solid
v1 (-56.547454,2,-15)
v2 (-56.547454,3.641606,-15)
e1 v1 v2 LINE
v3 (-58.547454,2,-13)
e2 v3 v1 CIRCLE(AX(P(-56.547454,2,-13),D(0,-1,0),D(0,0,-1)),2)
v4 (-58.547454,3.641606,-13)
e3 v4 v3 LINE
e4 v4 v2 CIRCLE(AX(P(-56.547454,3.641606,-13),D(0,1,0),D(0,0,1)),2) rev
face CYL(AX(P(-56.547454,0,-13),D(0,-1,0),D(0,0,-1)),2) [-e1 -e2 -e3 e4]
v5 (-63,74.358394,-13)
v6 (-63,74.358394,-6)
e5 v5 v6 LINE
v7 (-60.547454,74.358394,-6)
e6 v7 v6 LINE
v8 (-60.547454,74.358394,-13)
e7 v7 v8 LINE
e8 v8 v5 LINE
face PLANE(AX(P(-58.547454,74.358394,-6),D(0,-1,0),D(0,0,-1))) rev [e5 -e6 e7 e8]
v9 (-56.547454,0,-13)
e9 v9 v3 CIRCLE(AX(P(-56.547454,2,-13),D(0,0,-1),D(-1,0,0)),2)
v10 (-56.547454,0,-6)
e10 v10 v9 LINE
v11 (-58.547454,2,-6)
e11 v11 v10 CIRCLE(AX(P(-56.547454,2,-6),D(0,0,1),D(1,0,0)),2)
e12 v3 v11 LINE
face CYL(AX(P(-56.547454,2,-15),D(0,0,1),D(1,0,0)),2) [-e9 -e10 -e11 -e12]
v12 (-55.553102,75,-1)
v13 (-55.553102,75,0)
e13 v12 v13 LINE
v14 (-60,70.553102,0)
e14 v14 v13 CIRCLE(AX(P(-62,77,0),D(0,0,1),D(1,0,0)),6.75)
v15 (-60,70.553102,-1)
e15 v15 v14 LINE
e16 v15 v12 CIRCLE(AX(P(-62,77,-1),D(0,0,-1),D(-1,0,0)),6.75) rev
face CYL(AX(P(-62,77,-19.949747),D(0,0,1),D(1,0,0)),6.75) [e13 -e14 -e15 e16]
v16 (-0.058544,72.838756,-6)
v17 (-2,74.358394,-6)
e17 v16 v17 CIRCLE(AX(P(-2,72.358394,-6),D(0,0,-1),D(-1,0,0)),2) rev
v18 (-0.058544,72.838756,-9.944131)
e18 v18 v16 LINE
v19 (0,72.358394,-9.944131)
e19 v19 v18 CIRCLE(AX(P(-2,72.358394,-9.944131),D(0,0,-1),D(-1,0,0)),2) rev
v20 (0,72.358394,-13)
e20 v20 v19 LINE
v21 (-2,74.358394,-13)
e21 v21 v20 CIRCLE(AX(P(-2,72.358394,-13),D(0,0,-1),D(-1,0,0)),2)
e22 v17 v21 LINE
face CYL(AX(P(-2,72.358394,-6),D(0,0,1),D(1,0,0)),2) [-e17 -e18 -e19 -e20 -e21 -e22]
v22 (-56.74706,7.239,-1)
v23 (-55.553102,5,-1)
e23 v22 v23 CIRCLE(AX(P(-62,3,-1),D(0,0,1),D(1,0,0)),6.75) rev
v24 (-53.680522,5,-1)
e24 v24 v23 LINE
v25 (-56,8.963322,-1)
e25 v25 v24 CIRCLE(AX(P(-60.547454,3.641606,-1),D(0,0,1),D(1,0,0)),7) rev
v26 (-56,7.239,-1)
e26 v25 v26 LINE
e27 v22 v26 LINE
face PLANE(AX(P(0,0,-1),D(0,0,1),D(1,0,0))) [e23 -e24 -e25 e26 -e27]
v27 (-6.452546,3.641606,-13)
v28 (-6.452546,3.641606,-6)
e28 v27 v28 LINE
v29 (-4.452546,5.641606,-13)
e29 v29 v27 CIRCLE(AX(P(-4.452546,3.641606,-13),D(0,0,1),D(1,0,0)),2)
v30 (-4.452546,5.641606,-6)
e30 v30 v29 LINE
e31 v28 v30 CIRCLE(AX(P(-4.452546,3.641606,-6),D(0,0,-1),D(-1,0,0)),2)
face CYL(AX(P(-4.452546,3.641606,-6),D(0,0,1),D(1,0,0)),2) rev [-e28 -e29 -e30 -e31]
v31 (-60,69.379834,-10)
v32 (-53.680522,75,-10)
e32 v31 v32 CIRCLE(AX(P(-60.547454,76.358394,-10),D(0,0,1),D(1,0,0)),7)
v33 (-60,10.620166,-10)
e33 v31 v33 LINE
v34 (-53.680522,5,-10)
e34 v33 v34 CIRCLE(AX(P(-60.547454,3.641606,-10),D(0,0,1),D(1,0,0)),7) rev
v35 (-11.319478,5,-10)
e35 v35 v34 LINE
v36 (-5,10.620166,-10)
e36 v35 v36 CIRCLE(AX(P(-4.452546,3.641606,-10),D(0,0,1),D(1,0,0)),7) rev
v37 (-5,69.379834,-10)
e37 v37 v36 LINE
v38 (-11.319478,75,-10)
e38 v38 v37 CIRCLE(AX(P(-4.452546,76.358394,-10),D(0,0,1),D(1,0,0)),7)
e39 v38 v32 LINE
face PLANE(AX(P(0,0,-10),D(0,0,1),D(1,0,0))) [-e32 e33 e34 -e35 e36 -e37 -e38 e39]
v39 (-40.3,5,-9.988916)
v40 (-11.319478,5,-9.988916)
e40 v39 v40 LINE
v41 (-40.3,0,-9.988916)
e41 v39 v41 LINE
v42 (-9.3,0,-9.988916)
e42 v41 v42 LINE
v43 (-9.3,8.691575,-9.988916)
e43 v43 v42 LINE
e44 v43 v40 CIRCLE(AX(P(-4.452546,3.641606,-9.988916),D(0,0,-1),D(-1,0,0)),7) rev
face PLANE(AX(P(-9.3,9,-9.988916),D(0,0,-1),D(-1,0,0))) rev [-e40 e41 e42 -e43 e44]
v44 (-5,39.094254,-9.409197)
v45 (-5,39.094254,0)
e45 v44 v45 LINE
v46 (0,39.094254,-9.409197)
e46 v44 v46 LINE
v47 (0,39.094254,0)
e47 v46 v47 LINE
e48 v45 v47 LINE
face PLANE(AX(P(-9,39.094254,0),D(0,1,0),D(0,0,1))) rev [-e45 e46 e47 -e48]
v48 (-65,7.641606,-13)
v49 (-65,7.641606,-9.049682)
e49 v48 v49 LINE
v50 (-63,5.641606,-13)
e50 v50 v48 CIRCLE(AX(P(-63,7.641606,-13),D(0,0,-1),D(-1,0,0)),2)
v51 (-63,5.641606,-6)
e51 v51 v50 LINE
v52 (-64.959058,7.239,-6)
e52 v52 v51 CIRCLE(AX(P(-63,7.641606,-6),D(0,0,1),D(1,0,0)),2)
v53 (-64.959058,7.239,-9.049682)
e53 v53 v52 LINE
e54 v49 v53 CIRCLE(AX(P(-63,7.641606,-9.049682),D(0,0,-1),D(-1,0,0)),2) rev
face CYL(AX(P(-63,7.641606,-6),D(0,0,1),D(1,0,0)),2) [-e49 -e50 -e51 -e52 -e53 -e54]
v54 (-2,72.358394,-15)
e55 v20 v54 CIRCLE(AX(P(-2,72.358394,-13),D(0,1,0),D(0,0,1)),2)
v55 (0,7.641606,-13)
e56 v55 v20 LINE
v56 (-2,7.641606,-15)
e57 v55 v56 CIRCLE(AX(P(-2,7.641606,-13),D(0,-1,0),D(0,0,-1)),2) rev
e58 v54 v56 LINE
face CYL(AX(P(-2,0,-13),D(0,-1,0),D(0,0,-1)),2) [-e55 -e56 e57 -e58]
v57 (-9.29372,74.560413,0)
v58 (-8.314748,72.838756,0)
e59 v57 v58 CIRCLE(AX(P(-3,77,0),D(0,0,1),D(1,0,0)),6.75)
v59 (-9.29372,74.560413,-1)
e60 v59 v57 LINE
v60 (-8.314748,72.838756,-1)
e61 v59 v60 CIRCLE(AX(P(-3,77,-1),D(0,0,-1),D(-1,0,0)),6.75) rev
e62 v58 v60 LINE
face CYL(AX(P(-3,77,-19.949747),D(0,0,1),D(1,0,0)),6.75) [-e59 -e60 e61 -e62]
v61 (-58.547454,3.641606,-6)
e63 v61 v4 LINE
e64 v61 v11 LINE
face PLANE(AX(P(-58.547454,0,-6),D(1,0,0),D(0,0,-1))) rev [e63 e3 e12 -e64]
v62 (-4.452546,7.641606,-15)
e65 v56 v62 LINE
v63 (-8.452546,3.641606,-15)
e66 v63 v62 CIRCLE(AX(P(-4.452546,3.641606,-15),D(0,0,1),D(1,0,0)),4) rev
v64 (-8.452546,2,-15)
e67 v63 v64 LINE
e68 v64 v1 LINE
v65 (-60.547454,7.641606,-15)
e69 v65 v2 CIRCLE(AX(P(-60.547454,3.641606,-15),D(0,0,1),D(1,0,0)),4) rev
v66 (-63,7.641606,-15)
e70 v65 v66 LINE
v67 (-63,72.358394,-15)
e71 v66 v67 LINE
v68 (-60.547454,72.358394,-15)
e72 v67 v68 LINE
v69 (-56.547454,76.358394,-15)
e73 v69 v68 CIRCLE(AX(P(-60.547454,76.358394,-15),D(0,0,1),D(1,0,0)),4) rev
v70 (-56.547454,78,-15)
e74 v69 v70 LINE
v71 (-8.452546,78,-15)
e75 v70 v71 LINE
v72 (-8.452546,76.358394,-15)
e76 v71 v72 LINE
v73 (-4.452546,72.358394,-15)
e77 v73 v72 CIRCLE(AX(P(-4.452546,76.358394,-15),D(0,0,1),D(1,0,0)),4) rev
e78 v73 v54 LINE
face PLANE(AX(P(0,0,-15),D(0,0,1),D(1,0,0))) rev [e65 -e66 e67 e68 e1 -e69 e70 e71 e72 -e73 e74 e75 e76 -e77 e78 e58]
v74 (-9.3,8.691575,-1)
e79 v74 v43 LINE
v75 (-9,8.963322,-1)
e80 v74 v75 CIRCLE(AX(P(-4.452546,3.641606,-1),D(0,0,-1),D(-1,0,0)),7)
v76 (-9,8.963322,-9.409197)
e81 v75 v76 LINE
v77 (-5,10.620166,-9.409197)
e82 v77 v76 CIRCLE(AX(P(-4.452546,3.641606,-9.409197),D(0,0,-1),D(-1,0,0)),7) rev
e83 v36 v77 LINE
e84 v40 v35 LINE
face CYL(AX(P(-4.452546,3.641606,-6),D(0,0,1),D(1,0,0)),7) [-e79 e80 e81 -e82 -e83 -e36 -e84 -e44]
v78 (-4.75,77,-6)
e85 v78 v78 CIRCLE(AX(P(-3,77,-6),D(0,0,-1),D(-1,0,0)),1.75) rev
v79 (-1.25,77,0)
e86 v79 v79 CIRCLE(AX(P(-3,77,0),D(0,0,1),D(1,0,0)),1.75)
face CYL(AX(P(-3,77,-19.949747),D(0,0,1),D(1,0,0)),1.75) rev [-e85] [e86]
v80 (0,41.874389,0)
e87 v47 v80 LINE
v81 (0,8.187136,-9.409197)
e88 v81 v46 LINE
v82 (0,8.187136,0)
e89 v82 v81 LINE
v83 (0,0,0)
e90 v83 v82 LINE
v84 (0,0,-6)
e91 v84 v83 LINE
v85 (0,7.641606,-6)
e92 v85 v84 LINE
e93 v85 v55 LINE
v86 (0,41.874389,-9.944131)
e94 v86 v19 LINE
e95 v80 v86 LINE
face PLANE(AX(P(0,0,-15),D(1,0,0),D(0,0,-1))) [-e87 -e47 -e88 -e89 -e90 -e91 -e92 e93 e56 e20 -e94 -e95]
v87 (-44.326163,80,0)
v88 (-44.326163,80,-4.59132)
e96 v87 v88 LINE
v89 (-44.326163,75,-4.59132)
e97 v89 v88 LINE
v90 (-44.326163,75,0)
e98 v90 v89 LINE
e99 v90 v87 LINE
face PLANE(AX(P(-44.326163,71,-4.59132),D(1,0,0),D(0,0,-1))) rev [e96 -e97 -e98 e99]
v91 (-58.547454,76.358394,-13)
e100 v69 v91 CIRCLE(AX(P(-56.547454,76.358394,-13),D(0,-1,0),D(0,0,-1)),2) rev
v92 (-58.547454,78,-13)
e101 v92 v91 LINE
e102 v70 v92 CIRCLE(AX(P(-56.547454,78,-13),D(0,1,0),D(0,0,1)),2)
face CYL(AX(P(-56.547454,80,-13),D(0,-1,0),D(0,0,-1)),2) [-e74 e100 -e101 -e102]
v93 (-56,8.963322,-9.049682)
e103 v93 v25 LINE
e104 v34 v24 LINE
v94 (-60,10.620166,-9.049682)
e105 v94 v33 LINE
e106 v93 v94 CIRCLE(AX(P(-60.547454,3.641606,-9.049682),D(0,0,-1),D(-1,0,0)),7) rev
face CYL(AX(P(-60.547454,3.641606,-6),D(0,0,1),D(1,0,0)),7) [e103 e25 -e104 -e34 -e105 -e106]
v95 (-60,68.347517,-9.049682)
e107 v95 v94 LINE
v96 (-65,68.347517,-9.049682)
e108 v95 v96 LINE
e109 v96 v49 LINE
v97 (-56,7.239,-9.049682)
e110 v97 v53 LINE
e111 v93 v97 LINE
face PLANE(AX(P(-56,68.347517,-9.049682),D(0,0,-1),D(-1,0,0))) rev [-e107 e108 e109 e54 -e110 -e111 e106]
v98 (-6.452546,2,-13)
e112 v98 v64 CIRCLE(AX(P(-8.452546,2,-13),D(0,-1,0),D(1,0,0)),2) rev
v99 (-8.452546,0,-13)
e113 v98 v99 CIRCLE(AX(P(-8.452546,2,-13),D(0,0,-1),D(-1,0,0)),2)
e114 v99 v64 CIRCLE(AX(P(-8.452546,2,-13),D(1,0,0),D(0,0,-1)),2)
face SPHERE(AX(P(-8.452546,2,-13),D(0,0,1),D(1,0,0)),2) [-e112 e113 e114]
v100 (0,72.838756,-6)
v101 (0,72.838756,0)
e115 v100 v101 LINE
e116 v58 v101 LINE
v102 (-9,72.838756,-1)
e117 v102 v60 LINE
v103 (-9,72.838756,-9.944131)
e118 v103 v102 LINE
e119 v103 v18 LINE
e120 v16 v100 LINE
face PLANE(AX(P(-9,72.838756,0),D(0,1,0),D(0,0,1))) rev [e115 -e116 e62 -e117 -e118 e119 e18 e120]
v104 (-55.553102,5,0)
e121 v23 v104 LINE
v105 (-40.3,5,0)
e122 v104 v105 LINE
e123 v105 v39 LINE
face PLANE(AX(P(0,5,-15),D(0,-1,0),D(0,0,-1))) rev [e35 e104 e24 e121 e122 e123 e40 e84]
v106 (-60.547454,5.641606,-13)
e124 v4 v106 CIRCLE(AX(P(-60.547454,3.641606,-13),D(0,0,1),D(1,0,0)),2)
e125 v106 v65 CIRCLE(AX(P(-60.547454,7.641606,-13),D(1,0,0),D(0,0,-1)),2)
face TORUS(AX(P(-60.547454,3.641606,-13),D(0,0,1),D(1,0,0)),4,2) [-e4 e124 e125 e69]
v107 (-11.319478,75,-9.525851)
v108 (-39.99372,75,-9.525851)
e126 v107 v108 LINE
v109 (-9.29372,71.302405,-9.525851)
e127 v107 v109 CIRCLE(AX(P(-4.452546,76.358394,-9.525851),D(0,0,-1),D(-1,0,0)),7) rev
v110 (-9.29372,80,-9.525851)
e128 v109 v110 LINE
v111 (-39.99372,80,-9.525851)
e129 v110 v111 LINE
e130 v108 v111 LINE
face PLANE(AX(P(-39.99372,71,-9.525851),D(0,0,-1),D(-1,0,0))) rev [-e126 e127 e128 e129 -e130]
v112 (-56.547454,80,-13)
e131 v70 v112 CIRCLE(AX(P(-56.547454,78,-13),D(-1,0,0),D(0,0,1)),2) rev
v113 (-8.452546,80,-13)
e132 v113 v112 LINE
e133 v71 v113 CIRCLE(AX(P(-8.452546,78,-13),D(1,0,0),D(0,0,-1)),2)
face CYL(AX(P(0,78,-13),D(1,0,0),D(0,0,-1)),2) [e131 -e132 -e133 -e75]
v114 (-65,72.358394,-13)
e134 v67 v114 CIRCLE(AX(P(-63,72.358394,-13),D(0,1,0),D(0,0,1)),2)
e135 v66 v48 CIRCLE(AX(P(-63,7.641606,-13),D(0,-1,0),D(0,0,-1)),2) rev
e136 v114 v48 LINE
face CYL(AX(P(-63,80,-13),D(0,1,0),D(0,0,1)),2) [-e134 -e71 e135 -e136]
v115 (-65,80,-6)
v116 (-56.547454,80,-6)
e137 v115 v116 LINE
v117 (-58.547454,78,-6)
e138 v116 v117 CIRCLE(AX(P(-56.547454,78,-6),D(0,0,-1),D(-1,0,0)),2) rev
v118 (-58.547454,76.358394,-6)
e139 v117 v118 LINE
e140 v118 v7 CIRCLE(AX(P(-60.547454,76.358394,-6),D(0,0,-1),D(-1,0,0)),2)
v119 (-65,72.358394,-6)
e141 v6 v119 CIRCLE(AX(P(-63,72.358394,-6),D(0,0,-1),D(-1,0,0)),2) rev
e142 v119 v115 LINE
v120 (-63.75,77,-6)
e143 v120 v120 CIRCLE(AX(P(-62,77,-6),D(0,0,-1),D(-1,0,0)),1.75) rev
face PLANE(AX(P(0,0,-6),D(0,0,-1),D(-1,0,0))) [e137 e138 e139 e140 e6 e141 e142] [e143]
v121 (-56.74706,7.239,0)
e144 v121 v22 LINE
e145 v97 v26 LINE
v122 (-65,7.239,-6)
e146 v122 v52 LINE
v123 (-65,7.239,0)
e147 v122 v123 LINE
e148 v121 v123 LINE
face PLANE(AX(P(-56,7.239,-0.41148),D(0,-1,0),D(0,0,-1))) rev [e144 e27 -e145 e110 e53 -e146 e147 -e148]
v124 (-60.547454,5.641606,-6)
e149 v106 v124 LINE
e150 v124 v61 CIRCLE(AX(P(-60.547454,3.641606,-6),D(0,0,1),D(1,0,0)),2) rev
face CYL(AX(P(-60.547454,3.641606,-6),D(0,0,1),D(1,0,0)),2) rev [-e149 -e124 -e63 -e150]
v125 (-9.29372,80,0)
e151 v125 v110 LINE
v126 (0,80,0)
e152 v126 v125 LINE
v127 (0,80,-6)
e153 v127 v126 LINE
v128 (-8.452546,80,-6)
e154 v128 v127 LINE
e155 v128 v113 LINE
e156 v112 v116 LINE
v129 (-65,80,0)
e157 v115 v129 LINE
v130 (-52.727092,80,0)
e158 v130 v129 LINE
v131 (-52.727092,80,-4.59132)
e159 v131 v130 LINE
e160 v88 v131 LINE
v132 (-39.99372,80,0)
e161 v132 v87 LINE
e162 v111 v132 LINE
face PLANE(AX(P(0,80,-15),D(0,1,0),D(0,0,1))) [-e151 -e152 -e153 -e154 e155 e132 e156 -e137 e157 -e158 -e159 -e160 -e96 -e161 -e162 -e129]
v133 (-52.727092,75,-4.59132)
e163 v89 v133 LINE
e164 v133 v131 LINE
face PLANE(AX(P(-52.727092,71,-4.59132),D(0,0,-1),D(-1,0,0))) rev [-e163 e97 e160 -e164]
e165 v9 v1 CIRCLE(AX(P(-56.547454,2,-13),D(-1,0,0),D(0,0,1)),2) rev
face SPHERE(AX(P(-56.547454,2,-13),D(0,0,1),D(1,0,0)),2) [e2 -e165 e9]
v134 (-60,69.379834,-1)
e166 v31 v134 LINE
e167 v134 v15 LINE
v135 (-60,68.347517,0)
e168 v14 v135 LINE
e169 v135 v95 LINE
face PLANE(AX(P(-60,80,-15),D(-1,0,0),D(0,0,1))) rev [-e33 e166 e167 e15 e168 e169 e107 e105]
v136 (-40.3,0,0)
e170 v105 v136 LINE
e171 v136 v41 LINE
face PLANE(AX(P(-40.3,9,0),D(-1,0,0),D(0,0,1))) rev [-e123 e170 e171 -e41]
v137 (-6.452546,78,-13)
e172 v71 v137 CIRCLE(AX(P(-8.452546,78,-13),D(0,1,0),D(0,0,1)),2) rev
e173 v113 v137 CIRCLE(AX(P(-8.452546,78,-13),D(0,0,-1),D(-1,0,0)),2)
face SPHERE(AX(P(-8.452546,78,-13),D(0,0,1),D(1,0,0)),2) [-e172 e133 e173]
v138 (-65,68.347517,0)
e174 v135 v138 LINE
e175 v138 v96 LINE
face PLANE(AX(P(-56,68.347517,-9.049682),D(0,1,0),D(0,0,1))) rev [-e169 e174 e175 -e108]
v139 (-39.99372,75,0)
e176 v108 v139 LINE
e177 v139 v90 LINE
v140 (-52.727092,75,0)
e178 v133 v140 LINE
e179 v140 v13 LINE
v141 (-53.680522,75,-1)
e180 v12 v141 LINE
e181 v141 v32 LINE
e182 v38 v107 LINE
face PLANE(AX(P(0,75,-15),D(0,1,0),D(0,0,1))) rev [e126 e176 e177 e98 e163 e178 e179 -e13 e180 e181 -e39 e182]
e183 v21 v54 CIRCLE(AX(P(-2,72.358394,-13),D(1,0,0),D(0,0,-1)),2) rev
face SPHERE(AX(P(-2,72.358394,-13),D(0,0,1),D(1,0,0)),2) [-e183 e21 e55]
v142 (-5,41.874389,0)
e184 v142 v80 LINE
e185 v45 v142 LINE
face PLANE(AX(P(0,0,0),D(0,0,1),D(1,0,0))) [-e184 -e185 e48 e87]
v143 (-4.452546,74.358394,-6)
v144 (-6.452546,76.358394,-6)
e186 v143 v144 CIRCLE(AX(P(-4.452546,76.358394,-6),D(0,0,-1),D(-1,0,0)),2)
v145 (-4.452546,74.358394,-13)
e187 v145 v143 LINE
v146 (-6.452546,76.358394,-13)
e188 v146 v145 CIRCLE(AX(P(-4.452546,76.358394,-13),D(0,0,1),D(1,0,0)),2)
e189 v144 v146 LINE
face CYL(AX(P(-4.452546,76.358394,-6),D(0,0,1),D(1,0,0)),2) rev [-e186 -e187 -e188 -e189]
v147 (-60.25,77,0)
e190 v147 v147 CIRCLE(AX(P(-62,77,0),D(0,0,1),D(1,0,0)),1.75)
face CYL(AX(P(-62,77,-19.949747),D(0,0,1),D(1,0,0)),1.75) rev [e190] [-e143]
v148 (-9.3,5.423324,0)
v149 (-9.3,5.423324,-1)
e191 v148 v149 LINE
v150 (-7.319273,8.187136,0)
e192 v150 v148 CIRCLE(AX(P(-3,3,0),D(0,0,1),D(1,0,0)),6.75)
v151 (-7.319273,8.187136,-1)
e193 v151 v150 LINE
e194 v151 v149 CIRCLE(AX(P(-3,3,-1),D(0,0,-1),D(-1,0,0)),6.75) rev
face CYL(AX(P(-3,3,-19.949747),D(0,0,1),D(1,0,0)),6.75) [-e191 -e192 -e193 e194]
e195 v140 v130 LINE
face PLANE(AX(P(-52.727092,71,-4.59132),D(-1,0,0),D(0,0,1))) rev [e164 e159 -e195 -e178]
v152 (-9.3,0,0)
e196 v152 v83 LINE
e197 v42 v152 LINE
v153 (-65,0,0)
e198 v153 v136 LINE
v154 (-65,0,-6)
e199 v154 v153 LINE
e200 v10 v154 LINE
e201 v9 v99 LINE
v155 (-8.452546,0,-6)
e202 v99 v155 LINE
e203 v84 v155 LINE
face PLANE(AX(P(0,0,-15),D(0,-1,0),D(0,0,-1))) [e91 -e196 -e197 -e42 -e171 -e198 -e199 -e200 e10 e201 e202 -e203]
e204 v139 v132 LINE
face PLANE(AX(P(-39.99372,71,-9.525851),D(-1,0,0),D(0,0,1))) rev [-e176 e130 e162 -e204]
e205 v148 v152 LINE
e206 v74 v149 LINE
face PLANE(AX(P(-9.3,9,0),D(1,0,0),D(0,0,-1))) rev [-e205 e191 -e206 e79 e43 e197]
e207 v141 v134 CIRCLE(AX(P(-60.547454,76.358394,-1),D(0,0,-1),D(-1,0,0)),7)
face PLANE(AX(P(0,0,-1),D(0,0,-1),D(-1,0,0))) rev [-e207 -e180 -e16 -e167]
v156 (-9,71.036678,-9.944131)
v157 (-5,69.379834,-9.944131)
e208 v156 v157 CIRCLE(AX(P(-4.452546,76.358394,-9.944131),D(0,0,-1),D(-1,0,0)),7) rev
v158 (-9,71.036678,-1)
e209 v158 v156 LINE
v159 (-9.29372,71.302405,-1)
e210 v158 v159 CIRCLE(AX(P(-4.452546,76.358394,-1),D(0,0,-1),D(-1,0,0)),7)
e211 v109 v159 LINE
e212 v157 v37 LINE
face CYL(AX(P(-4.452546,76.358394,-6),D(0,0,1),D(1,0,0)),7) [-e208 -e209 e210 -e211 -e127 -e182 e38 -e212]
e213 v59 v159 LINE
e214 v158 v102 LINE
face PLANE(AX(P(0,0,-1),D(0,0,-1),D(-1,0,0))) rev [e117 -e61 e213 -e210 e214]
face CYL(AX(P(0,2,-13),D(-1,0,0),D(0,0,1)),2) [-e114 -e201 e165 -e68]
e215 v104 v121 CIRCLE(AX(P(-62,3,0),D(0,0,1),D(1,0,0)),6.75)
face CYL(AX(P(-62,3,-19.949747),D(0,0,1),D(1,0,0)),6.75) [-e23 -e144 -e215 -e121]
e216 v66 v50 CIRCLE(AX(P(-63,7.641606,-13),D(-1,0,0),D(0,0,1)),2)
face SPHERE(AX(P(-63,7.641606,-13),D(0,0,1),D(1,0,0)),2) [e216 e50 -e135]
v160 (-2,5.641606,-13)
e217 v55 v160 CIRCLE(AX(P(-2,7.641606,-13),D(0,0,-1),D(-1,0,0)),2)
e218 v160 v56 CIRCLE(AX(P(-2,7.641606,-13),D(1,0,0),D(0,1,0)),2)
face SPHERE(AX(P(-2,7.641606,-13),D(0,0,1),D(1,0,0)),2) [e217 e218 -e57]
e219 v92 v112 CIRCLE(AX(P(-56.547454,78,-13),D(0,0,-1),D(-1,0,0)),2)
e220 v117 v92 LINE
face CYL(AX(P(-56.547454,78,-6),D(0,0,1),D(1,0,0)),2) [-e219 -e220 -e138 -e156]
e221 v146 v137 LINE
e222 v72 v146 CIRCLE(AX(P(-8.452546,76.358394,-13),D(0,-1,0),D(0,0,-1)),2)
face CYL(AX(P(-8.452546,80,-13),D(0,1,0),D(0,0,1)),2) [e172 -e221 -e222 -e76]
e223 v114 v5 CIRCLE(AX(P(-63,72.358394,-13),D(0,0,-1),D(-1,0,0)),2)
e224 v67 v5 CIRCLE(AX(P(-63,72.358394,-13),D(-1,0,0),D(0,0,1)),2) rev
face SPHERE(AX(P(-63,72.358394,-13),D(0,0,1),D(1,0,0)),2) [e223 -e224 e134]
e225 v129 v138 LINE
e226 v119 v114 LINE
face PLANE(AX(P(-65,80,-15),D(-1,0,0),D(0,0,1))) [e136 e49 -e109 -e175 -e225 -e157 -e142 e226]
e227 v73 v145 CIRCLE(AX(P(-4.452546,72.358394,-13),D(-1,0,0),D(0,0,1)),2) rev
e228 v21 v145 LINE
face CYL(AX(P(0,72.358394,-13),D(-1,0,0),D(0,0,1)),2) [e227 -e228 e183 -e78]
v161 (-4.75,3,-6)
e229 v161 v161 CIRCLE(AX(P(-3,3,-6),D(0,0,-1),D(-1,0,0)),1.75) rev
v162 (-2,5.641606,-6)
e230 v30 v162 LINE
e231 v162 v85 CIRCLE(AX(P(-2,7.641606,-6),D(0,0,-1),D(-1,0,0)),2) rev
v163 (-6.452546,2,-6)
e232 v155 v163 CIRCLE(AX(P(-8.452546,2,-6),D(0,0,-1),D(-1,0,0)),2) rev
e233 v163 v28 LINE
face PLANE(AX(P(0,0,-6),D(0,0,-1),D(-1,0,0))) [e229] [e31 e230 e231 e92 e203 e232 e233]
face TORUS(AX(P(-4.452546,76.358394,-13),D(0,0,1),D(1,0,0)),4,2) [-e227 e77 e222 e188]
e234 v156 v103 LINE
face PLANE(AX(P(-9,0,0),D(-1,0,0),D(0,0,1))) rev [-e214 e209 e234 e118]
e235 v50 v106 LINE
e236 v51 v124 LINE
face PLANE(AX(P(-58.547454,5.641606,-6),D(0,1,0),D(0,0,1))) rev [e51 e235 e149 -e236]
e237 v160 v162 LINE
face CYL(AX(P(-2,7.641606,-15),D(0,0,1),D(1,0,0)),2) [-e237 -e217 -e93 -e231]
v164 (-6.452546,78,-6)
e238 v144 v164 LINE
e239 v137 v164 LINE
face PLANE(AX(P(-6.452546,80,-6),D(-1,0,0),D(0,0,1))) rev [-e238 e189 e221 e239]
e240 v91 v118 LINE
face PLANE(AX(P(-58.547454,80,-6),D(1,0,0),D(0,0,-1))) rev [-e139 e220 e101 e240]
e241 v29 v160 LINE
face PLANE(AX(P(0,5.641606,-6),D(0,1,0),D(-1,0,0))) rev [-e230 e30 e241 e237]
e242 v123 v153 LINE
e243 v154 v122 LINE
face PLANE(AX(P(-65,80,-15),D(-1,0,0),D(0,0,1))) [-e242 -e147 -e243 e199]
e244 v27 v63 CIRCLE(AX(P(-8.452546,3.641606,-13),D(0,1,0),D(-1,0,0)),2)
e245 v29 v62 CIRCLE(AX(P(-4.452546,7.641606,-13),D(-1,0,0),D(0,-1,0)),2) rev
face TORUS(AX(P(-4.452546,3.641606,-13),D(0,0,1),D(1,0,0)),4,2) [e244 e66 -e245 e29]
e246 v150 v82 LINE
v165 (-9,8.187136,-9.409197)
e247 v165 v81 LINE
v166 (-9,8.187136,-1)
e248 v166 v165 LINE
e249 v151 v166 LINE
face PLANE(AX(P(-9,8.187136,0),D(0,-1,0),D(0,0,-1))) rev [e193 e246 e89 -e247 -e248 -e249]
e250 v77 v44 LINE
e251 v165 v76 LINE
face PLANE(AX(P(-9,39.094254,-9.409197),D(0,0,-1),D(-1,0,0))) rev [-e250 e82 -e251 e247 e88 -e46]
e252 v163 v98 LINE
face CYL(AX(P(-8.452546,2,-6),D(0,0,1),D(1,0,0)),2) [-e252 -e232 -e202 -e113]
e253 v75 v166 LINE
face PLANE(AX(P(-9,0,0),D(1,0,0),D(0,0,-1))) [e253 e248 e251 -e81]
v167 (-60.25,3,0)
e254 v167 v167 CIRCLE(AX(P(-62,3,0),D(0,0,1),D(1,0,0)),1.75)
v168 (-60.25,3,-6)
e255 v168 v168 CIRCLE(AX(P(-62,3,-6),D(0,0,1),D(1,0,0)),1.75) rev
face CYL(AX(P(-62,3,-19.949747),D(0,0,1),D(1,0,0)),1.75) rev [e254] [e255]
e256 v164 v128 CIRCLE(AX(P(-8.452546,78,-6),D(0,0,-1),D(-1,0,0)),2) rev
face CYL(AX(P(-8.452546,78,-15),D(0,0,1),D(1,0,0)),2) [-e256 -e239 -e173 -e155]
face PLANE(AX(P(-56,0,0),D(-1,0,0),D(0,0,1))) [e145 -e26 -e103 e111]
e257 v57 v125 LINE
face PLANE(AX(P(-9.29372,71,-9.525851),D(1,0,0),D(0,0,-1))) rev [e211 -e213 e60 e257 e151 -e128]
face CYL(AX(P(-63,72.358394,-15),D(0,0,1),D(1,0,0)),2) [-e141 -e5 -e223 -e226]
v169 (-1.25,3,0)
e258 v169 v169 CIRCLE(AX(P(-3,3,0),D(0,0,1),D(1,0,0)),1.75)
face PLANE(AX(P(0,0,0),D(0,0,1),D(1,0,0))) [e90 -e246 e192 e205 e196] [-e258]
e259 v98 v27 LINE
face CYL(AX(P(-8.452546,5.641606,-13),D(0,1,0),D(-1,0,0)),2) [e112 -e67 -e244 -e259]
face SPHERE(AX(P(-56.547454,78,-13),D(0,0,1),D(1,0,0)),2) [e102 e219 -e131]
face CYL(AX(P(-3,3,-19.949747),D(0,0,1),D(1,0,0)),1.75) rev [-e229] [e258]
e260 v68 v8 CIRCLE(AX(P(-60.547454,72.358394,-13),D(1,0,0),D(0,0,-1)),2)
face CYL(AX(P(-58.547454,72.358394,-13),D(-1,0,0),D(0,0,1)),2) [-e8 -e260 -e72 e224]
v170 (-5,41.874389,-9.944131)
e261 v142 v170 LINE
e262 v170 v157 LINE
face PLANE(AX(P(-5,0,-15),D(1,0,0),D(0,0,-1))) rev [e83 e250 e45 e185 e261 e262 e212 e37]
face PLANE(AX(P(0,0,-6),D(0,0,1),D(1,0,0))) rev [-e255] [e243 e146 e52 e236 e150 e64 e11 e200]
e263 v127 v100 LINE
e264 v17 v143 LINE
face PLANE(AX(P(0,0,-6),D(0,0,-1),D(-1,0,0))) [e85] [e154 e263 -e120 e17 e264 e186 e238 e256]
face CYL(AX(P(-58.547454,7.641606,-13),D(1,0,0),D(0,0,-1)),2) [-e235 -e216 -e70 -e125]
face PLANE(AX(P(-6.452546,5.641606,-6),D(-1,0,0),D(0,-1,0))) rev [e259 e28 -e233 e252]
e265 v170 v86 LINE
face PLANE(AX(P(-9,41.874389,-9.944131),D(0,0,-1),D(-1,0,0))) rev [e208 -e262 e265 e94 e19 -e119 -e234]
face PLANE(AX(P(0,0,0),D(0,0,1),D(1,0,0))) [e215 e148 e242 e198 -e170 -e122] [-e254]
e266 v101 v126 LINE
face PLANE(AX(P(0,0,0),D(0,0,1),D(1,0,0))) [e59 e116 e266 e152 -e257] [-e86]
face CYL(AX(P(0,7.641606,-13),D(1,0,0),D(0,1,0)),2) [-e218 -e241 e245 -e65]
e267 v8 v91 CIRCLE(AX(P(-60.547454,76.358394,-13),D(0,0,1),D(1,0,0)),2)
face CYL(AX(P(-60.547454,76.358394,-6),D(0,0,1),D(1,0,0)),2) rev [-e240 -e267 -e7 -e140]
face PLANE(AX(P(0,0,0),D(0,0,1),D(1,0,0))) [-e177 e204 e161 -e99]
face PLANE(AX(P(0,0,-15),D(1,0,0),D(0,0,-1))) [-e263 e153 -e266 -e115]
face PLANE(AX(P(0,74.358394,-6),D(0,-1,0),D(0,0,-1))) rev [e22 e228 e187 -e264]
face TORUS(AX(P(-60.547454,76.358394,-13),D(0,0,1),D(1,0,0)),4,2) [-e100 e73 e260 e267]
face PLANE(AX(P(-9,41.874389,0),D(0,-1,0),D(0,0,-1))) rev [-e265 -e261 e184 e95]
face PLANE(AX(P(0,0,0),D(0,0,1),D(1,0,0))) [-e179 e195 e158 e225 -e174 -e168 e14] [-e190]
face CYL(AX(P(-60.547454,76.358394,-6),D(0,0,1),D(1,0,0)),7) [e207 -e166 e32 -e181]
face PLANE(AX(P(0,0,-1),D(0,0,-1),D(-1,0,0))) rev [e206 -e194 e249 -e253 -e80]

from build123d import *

# Parameters (mm, degrees)
SKETCH1_W           = 65
SKETCH1_H           = 80
BOSS_EXTRUDE1_DEPTH = 15
SKETCH2_R           = 1.75
CUT_EXTRUDE1_DEPTH  = 15
SKETCH3_W           = 6.452545503
SKETCH3_H           = 5.641605939
CUT_EXTRUDE2_DEPTH  = 9
FILLET1_R           = 2
SHELL1_START        = -10
SHELL1_DEPTH        = 10
SHELL1_START_2      = -1
SHELL1_2_DEPTH      = 1
SKETCH4_W           = 31
SKETCH4_H           = 9.988916405
CUT_EXTRUDE3_DEPTH  = 9
SKETCH5_W           = 9.944131197
SKETCH5_H           = 30.964366914
SKETCH5_W_2         = 9.409197356
SKETCH5_H_2         = 30.907117663
CUT_EXTRUDE4_DEPTH  = 9
SKETCH6_W           = 8.400929104
SKETCH6_H           = 4.591319751
SKETCH6_W_2         = 30.7
SKETCH6_H_2         = 9.525851227
CUT_EXTRUDE5_DEPTH  = 9
CUT_EXTRUDE6_DEPTH  = 9


# Read off the part's stored shape, not the designer's step: Shell1
with BuildPart() as part:
    # Sketch1 → Boss-Extrude1 (new body)
    with BuildSketch(Plane.XY):
        with Locations((-32.5, 40)):
            Rectangle(SKETCH1_W, SKETCH1_H)
    extrude(amount=-BOSS_EXTRUDE1_DEPTH)

    # Sketch2 → Cut-Extrude1 (cut)
    with BuildSketch(Plane.XY):
        with Locations((-3, 3)):
            Circle(SKETCH2_R)
        with Locations((-62, 3)):
            Circle(SKETCH2_R)
        with Locations((-62, 77)):
            Circle(SKETCH2_R)
        with Locations((-3, 77)):
            Circle(SKETCH2_R)
    extrude(amount=-CUT_EXTRUDE1_DEPTH, mode=Mode.SUBTRACT)

    # Sketch3 → Cut-Extrude2 (cut)
    with BuildSketch(Plane(origin=(0, 0, -15), x_dir=(-1, 0, 0), z_dir=(0, 0, -1))):
        with Locations((3.226272752, 77.179197031)):
            Rectangle(SKETCH3_W, SKETCH3_H)
        with Locations((61.773727249, 77.179197031)):
            Rectangle(SKETCH3_W, SKETCH3_H)
        with Locations((3.226272752, 2.82080297)):
            Rectangle(SKETCH3_W, SKETCH3_H)
        with Locations((61.773727249, 2.82080297)):
            Rectangle(SKETCH3_W, SKETCH3_H)
    extrude(amount=-CUT_EXTRUDE2_DEPTH, mode=Mode.SUBTRACT)

    # Fillet1
    fillet1_edges = [part.edges().sort_by_distance(p)[0] for p in [
        (-32.5, 0, -15),
        (-65, 40, -15),
        (-32.5, 80, -15),
        (0, 40, -15),
        (-58.547454497, 77.17919703, -15),
        (-61.773727249, 74.358394061, -15),
        (-58.547454497, 74.358394061, -10.5),
        (-58.547454497, 80, -10.5),
        (-65, 74.358394061, -10.5),
        (-6.452545503, 2.82080297, -15),
        (-3.226272751, 5.641605939, -15),
        (0, 5.641605939, -10.5),
        (-6.452545503, 5.641605939, -10.5),
        (-6.452545503, 0, -10.5),
        (-58.547454497, 2.82080297, -15),
        (-61.773727249, 5.641605939, -15),
        (-58.547454497, 0, -10.5),
        (-58.547454497, 5.641605939, -10.5),
        (-65, 5.641605939, -10.5),
        (-3.226272751, 74.358394061, -15),
        (-6.452545503, 77.17919703, -15),
        (0, 74.358394061, -10.5),
        (-6.452545503, 80, -10.5),
        (-6.452545503, 74.358394061, -10.5),
    ]]
    fillet(fillet1_edges, radius=FILLET1_R)

    # Shell1 outline → Shell1 (cut)
    with BuildSketch(Plane.XY.offset(SHELL1_START)):
        with BuildLine():
            ThreePointArc((-11.319478266, 5), (-9.104410686, 8.872299041), (-5, 10.620165502))
            Line((-5, 10.620165502), (-5, 69.379834498))
            ThreePointArc((-5, 69.379834498), (-9.104410686, 71.127700959), (-11.319478266, 75))
            Line((-11.319478266, 75), (-53.680521734, 75))
            ThreePointArc((-53.680521734, 75), (-55.895589314, 71.127700959), (-60, 69.379834498))
            Line((-60, 69.379834498), (-60, 10.620165502))
            ThreePointArc((-60, 10.620165502), (-55.895589314, 8.872299041), (-53.680521734, 5))
            Line((-53.680521734, 5), (-11.319478266, 5))
        make_face()
    extrude(amount=SHELL1_DEPTH, mode=Mode.SUBTRACT)

    # Shell1 2 outline → Shell1 2 (cut)
    with BuildSketch(Plane.XY.offset(SHELL1_START_2)):
        with BuildLine():
            ThreePointArc((-9.446898479, 5), (-7.772970773, 7.772970773), (-5, 9.446898479))
            Line((-5, 9.446898479), (-5, 10.620165502))
            ThreePointArc((-5, 10.620165502), (-9.104410686, 8.872299041), (-11.319478266, 5))
            Line((-11.319478266, 5), (-9.446898479, 5))
        make_face()
        with BuildLine():
            ThreePointArc((-11.319478266, 75), (-9.104410686, 71.127700959), (-5, 69.379834498))
            Line((-5, 69.379834498), (-5, 70.553101521))
            ThreePointArc((-5, 70.553101521), (-7.772970773, 72.227029227), (-9.446898479, 75))
            Line((-9.446898479, 75), (-11.319478266, 75))
        make_face()
        with BuildLine():
            Line((-55.553101521, 5), (-53.680521734, 5))
            ThreePointArc((-53.680521734, 5), (-55.895589314, 8.872299041), (-60, 10.620165502))
            Line((-60, 10.620165502), (-60, 9.446898479))
            ThreePointArc((-60, 9.446898479), (-57.227029227, 7.772970773), (-55.553101521, 5))
        make_face()
        with BuildLine():
            ThreePointArc((-60, 69.379834498), (-55.895589314, 71.127700959), (-53.680521734, 75))
            Line((-53.680521734, 75), (-55.553101521, 75))
            ThreePointArc((-55.553101521, 75), (-57.227029227, 72.227029227), (-60, 70.553101521))
            Line((-60, 70.553101521), (-60, 69.379834498))
        make_face()
    extrude(amount=SHELL1_2_DEPTH, mode=Mode.SUBTRACT)

    # Sketch4 → Cut-Extrude3 (cut)
    with BuildSketch(Plane.XZ):
        with Locations((-24.8, -4.994458203)):
            Rectangle(SKETCH4_W, SKETCH4_H)
    extrude(amount=-CUT_EXTRUDE3_DEPTH, mode=Mode.SUBTRACT)

    # Sketch5 → Cut-Extrude4 (cut)
    with BuildSketch(Plane(origin=(0, 0, 0), x_dir=(0, 0, -1), z_dir=(1, 0, 0))):
        with Locations((4.972065599, 57.356572465)):
            Rectangle(SKETCH5_W, SKETCH5_H)
        with Locations((4.704598678, 23.640694869)):
            Rectangle(SKETCH5_W_2, SKETCH5_H_2)
    extrude(amount=-CUT_EXTRUDE4_DEPTH, mode=Mode.SUBTRACT)

    # Sketch6 → Cut-Extrude5 (cut)
    with BuildSketch(Plane(origin=(0, 80, 0), x_dir=(1, 0, 0), z_dir=(0, 1, 0))):
        with Locations((-48.526627408, 2.295659876)):
            Rectangle(SKETCH6_W, SKETCH6_H)
        with Locations((-24.643720135, 4.762925614)):
            Rectangle(SKETCH6_W_2, SKETCH6_H_2)
    extrude(amount=-CUT_EXTRUDE5_DEPTH, mode=Mode.SUBTRACT)

    # Sketch7 → Cut-Extrude6 (cut)
    with BuildSketch(Plane.ZY.offset(65)):
        Polygon((-0.41148, 7.238999939), (0, 7.238999939), (0, 68.347517032), (-0.41148, 68.347517032), (-9.049681563, 68.347517032), (-9.049681563, 7.238999939), align=None)
    extrude(amount=-CUT_EXTRUDE6_DEPTH, mode=Mode.SUBTRACT)


solid = part.part
